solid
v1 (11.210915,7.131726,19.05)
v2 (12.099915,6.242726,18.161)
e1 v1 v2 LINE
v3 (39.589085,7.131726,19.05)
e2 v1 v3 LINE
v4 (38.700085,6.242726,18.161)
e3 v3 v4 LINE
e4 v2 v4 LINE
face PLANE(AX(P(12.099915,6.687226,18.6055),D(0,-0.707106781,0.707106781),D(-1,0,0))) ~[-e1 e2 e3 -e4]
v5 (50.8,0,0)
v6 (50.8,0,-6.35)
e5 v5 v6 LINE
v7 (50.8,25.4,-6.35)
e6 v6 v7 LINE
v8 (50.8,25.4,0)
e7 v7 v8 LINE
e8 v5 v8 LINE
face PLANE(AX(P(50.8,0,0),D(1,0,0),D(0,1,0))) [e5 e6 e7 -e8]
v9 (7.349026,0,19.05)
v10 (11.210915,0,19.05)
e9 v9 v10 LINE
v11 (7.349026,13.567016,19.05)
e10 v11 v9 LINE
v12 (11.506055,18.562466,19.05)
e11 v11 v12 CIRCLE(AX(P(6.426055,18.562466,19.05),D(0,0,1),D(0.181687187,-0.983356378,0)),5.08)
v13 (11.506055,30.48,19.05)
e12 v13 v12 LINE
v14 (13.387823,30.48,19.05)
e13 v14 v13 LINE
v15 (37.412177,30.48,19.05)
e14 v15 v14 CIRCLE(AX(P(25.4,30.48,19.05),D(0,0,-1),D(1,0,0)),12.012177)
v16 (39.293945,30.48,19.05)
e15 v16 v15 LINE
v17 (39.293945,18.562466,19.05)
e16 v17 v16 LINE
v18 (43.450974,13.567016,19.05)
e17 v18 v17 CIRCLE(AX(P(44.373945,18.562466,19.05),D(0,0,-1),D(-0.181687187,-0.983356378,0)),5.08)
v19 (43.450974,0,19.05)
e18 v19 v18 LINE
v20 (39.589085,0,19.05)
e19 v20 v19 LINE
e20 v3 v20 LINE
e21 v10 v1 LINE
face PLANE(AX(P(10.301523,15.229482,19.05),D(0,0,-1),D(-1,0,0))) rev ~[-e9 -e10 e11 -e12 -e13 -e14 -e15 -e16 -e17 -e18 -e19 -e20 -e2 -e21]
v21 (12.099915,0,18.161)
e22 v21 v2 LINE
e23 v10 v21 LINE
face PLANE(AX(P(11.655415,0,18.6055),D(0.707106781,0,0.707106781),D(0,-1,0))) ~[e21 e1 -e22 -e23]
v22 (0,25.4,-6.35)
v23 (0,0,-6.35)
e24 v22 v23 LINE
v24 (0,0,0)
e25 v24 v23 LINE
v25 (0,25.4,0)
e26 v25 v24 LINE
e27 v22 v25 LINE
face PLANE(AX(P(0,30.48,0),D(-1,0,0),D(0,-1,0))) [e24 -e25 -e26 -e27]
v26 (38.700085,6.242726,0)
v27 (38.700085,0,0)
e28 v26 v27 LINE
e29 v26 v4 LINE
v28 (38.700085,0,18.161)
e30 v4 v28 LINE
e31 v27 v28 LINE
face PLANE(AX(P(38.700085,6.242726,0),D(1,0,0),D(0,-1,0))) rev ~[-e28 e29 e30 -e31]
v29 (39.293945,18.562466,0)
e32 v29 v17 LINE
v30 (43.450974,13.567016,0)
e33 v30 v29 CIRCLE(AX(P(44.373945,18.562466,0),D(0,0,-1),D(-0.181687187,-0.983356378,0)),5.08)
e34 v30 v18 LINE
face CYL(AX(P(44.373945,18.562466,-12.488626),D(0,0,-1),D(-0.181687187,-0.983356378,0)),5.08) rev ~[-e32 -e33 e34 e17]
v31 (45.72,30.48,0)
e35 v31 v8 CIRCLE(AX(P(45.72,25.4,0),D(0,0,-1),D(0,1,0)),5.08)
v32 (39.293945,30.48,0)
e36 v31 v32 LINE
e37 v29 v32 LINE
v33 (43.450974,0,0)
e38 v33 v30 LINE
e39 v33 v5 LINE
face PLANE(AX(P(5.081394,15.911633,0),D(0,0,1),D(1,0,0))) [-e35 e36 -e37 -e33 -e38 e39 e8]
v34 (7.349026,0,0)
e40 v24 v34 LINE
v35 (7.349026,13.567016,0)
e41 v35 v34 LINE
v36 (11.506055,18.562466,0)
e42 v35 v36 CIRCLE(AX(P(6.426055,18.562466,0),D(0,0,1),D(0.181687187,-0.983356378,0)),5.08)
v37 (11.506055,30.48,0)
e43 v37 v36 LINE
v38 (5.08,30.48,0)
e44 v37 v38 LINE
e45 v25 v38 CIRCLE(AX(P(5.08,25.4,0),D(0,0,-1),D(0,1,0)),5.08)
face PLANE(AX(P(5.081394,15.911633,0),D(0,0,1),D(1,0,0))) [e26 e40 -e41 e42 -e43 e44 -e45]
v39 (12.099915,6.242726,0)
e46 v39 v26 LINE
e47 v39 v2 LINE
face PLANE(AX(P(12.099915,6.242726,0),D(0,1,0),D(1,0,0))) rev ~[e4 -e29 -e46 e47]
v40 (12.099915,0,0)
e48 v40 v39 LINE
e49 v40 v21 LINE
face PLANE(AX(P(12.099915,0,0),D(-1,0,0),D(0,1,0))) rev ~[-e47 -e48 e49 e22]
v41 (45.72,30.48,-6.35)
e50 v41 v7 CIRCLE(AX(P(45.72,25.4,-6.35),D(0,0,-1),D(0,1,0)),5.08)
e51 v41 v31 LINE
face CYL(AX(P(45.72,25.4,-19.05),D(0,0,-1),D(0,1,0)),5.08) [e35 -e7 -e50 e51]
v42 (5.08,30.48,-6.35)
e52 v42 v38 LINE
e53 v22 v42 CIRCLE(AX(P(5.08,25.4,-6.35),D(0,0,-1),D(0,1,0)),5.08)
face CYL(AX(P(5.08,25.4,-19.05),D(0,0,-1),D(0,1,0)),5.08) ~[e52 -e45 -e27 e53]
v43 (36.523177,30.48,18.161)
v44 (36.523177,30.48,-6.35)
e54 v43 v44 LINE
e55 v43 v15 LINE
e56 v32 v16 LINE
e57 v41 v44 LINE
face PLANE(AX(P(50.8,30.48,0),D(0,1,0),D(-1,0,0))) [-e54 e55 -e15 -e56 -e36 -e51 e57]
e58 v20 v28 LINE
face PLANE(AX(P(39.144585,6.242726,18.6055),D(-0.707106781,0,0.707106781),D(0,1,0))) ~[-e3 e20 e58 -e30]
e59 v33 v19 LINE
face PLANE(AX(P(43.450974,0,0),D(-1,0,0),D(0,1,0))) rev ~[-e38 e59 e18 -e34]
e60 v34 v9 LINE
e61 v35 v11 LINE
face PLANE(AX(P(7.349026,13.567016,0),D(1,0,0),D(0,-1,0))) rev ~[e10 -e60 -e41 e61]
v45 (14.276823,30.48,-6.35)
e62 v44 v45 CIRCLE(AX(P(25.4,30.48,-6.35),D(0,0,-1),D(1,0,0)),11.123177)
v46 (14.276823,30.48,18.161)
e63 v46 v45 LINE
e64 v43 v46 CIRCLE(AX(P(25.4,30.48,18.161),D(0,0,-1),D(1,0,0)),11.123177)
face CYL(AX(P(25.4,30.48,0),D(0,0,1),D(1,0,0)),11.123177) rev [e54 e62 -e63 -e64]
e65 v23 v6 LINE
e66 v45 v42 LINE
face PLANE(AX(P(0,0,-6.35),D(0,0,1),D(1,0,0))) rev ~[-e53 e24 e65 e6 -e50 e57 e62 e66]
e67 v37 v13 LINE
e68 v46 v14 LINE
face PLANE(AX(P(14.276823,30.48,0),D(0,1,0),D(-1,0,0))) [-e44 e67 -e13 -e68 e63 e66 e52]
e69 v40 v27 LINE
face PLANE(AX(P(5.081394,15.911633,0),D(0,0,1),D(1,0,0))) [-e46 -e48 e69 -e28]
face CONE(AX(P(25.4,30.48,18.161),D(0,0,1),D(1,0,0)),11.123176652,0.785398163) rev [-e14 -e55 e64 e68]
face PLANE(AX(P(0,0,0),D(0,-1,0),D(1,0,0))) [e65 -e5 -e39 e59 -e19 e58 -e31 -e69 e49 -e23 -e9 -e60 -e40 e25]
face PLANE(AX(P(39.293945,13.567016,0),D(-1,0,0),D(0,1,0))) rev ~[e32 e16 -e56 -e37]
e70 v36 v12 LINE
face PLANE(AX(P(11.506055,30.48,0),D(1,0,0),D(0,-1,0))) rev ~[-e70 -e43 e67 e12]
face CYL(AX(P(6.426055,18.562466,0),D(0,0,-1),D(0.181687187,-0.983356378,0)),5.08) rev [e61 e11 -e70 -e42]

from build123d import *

# Parameters (mm, degrees)
F1_DEPTH     = 19.05
F0_W         = 26.6001702666
F0_H         = 6.2427259982
F2_DEPTH     = 6.35
F3_T1_DEPTH  = 19.05
F3_T6_DEPTH  = 31.5386260012
F3_T8_DEPTH  = 31.75
F3_T10_DEPTH = 31.75
F4_SIZE      = 0.889


# Not quite as in the source:
# - a fillet or chamfer that OpenCascade refuses, or shapes differently, is made with other operations: its cross-section is extruded or revolved along the edge and cut away or added


with BuildPart() as f1:
    # F0 (on Top) → F1 (new body)
    with BuildSketch(Plane.XY):
        with BuildLine():
            Line((7.349026072, 13.5670155287), (7.349026072, 0))
            Line((7.349026072, 0), (12.0999148667, 0))
            Line((12.0999148667, 0), (12.0999148667, 6.2427259982))
            Line((12.0999148667, 6.2427259982), (38.7000851333, 6.2427259982))
            Line((38.7000851333, 6.2427259982), (38.7000851333, 0))
            Line((38.7000851333, 0), (43.450973928, 0))
            Line((43.450973928, 0), (43.450973928, 13.5670155287))
            Line((43.450973928, 13.5670155287), (39.2939448357, 13.5670155287))
            Line((39.2939448357, 13.5670155287), (39.2939448357, 30.48))
            Line((39.2939448357, 30.48), (36.5231766516, 30.48))
            ThreePointArc((36.5231766516, 30.48), (25.4, 19.3568233484), (14.2768233484, 30.48))
            Line((14.2768233484, 30.48), (11.5060551643, 30.48))
            Line((11.5060551643, 30.48), (11.5060551643, 13.5670155287))
            Line((11.5060551643, 13.5670155287), (7.349026072, 13.5670155287))
        make_face()
    extrude(amount=F1_DEPTH)

    # F0 (on Top) → F2 (join)
    with BuildSketch(Plane.XY):
        Polygon((0, 30.48), (0, 0), (7.349026072, 0), (7.349026072, 13.5670155287), (11.5060551643, 13.5670155287), (11.5060551643, 30.48), align=None)
        with Locations((25.4, 3.1213629991)):
            Rectangle(F0_W, F0_H)
        Polygon((43.450973928, 13.5670155287), (43.450973928, 0), (50.8, 0), (50.8, 30.48), (39.2939448357, 30.48), (39.2939448357, 13.5670155287), align=None)
        with BuildLine():
            Line((7.349026072, 13.5670155287), (7.349026072, 0))
            Line((7.349026072, 0), (12.0999148667, 0))
            Line((12.0999148667, 0), (12.0999148667, 6.2427259982))
            Line((12.0999148667, 6.2427259982), (38.7000851333, 6.2427259982))
            Line((38.7000851333, 6.2427259982), (38.7000851333, 0))
            Line((38.7000851333, 0), (43.450973928, 0))
            Line((43.450973928, 0), (43.450973928, 13.5670155287))
            Line((43.450973928, 13.5670155287), (39.2939448357, 13.5670155287))
            Line((39.2939448357, 13.5670155287), (39.2939448357, 30.48))
            Line((39.2939448357, 30.48), (36.5231766516, 30.48))
            ThreePointArc((36.5231766516, 30.48), (25.4, 19.3568233484), (14.2768233484, 30.48))
            Line((14.2768233484, 30.48), (11.5060551643, 30.48))
            Line((11.5060551643, 30.48), (11.5060551643, 13.5670155287))
            Line((11.5060551643, 13.5670155287), (7.349026072, 13.5670155287))
        make_face()
    extrude(amount=-F2_DEPTH)

    # F3: fillet of radius 5.08 on 4 edges, made by hand

    # F3_s2 → F3_t1 (join)
    with BuildSketch(Plane.XY):
        with BuildLine():
            ThreePointArc((7.349026072, 13.5670155287), (10.3308658007, 15.3130269169), (11.5060551643, 18.5624659292))
            Line((11.5060551643, 18.5624659292), (11.5060551643, 13.5670155287))
            Line((11.5060551643, 13.5670155287), (7.349026072, 13.5670155287))
        make_face()
    extrude(amount=F3_T1_DEPTH)


with BuildPart() as f3_tool4:
    # F3_s5 → F3_t6 (new body)
    with BuildSketch(Plane.XY.offset(-12.4886260012)):
        with BuildLine():
            ThreePointArc((43.450973928, 13.5670155287), (40.4691341993, 15.3130269169), (39.2939448357, 18.5624659292))
            Line((39.2939448357, 18.5624659292), (39.2939448357, 13.5670155287))
            Line((39.2939448357, 13.5670155287), (43.450973928, 13.5670155287))
        make_face()
    extrude(amount=F3_T6_DEPTH)

    split(bisect_by=Plane.XY.offset(-6.35), keep=Keep.TOP)


with BuildPart() as f1_1:
    add(f1.part)

    # F3_t3: union F3_tool4
    add(f3_tool4.part)

    # F3_s9 → F3_t8 (cut)
    with BuildSketch(Plane.XY.offset(-19.05)):
        with BuildLine():
            ThreePointArc((5.08, 30.48), (1.4878975516, 28.9921024484), (0, 25.4))
            Line((0, 25.4), (0, 30.48))
            Line((0, 30.48), (5.08, 30.48))
        make_face()
    extrude(amount=F3_T8_DEPTH, mode=Mode.SUBTRACT)

    # F3_s11 → F3_t10 (cut)
    with BuildSketch(Plane.XY.offset(-19.05)):
        with BuildLine():
            ThreePointArc((45.72, 30.48), (49.3121024484, 28.9921024484), (50.8, 25.4))
            Line((50.8, 25.4), (50.8, 30.48))
            Line((50.8, 30.48), (45.72, 30.48))
        make_face()
    extrude(amount=F3_T10_DEPTH, mode=Mode.SUBTRACT)

    # F4
    f4_edges = [f1_1.edges().sort_by_distance(p)[0] for p in [
        (25.4, 19.356823, 19.05),
        (25.4, 6.242726, 19.05),
        (38.700085, 3.121363, 19.05),
        (12.099915, 3.121363, 19.05),
    ]]
    chamfer(f4_edges, length=F4_SIZE)


solid = f1_1.part
